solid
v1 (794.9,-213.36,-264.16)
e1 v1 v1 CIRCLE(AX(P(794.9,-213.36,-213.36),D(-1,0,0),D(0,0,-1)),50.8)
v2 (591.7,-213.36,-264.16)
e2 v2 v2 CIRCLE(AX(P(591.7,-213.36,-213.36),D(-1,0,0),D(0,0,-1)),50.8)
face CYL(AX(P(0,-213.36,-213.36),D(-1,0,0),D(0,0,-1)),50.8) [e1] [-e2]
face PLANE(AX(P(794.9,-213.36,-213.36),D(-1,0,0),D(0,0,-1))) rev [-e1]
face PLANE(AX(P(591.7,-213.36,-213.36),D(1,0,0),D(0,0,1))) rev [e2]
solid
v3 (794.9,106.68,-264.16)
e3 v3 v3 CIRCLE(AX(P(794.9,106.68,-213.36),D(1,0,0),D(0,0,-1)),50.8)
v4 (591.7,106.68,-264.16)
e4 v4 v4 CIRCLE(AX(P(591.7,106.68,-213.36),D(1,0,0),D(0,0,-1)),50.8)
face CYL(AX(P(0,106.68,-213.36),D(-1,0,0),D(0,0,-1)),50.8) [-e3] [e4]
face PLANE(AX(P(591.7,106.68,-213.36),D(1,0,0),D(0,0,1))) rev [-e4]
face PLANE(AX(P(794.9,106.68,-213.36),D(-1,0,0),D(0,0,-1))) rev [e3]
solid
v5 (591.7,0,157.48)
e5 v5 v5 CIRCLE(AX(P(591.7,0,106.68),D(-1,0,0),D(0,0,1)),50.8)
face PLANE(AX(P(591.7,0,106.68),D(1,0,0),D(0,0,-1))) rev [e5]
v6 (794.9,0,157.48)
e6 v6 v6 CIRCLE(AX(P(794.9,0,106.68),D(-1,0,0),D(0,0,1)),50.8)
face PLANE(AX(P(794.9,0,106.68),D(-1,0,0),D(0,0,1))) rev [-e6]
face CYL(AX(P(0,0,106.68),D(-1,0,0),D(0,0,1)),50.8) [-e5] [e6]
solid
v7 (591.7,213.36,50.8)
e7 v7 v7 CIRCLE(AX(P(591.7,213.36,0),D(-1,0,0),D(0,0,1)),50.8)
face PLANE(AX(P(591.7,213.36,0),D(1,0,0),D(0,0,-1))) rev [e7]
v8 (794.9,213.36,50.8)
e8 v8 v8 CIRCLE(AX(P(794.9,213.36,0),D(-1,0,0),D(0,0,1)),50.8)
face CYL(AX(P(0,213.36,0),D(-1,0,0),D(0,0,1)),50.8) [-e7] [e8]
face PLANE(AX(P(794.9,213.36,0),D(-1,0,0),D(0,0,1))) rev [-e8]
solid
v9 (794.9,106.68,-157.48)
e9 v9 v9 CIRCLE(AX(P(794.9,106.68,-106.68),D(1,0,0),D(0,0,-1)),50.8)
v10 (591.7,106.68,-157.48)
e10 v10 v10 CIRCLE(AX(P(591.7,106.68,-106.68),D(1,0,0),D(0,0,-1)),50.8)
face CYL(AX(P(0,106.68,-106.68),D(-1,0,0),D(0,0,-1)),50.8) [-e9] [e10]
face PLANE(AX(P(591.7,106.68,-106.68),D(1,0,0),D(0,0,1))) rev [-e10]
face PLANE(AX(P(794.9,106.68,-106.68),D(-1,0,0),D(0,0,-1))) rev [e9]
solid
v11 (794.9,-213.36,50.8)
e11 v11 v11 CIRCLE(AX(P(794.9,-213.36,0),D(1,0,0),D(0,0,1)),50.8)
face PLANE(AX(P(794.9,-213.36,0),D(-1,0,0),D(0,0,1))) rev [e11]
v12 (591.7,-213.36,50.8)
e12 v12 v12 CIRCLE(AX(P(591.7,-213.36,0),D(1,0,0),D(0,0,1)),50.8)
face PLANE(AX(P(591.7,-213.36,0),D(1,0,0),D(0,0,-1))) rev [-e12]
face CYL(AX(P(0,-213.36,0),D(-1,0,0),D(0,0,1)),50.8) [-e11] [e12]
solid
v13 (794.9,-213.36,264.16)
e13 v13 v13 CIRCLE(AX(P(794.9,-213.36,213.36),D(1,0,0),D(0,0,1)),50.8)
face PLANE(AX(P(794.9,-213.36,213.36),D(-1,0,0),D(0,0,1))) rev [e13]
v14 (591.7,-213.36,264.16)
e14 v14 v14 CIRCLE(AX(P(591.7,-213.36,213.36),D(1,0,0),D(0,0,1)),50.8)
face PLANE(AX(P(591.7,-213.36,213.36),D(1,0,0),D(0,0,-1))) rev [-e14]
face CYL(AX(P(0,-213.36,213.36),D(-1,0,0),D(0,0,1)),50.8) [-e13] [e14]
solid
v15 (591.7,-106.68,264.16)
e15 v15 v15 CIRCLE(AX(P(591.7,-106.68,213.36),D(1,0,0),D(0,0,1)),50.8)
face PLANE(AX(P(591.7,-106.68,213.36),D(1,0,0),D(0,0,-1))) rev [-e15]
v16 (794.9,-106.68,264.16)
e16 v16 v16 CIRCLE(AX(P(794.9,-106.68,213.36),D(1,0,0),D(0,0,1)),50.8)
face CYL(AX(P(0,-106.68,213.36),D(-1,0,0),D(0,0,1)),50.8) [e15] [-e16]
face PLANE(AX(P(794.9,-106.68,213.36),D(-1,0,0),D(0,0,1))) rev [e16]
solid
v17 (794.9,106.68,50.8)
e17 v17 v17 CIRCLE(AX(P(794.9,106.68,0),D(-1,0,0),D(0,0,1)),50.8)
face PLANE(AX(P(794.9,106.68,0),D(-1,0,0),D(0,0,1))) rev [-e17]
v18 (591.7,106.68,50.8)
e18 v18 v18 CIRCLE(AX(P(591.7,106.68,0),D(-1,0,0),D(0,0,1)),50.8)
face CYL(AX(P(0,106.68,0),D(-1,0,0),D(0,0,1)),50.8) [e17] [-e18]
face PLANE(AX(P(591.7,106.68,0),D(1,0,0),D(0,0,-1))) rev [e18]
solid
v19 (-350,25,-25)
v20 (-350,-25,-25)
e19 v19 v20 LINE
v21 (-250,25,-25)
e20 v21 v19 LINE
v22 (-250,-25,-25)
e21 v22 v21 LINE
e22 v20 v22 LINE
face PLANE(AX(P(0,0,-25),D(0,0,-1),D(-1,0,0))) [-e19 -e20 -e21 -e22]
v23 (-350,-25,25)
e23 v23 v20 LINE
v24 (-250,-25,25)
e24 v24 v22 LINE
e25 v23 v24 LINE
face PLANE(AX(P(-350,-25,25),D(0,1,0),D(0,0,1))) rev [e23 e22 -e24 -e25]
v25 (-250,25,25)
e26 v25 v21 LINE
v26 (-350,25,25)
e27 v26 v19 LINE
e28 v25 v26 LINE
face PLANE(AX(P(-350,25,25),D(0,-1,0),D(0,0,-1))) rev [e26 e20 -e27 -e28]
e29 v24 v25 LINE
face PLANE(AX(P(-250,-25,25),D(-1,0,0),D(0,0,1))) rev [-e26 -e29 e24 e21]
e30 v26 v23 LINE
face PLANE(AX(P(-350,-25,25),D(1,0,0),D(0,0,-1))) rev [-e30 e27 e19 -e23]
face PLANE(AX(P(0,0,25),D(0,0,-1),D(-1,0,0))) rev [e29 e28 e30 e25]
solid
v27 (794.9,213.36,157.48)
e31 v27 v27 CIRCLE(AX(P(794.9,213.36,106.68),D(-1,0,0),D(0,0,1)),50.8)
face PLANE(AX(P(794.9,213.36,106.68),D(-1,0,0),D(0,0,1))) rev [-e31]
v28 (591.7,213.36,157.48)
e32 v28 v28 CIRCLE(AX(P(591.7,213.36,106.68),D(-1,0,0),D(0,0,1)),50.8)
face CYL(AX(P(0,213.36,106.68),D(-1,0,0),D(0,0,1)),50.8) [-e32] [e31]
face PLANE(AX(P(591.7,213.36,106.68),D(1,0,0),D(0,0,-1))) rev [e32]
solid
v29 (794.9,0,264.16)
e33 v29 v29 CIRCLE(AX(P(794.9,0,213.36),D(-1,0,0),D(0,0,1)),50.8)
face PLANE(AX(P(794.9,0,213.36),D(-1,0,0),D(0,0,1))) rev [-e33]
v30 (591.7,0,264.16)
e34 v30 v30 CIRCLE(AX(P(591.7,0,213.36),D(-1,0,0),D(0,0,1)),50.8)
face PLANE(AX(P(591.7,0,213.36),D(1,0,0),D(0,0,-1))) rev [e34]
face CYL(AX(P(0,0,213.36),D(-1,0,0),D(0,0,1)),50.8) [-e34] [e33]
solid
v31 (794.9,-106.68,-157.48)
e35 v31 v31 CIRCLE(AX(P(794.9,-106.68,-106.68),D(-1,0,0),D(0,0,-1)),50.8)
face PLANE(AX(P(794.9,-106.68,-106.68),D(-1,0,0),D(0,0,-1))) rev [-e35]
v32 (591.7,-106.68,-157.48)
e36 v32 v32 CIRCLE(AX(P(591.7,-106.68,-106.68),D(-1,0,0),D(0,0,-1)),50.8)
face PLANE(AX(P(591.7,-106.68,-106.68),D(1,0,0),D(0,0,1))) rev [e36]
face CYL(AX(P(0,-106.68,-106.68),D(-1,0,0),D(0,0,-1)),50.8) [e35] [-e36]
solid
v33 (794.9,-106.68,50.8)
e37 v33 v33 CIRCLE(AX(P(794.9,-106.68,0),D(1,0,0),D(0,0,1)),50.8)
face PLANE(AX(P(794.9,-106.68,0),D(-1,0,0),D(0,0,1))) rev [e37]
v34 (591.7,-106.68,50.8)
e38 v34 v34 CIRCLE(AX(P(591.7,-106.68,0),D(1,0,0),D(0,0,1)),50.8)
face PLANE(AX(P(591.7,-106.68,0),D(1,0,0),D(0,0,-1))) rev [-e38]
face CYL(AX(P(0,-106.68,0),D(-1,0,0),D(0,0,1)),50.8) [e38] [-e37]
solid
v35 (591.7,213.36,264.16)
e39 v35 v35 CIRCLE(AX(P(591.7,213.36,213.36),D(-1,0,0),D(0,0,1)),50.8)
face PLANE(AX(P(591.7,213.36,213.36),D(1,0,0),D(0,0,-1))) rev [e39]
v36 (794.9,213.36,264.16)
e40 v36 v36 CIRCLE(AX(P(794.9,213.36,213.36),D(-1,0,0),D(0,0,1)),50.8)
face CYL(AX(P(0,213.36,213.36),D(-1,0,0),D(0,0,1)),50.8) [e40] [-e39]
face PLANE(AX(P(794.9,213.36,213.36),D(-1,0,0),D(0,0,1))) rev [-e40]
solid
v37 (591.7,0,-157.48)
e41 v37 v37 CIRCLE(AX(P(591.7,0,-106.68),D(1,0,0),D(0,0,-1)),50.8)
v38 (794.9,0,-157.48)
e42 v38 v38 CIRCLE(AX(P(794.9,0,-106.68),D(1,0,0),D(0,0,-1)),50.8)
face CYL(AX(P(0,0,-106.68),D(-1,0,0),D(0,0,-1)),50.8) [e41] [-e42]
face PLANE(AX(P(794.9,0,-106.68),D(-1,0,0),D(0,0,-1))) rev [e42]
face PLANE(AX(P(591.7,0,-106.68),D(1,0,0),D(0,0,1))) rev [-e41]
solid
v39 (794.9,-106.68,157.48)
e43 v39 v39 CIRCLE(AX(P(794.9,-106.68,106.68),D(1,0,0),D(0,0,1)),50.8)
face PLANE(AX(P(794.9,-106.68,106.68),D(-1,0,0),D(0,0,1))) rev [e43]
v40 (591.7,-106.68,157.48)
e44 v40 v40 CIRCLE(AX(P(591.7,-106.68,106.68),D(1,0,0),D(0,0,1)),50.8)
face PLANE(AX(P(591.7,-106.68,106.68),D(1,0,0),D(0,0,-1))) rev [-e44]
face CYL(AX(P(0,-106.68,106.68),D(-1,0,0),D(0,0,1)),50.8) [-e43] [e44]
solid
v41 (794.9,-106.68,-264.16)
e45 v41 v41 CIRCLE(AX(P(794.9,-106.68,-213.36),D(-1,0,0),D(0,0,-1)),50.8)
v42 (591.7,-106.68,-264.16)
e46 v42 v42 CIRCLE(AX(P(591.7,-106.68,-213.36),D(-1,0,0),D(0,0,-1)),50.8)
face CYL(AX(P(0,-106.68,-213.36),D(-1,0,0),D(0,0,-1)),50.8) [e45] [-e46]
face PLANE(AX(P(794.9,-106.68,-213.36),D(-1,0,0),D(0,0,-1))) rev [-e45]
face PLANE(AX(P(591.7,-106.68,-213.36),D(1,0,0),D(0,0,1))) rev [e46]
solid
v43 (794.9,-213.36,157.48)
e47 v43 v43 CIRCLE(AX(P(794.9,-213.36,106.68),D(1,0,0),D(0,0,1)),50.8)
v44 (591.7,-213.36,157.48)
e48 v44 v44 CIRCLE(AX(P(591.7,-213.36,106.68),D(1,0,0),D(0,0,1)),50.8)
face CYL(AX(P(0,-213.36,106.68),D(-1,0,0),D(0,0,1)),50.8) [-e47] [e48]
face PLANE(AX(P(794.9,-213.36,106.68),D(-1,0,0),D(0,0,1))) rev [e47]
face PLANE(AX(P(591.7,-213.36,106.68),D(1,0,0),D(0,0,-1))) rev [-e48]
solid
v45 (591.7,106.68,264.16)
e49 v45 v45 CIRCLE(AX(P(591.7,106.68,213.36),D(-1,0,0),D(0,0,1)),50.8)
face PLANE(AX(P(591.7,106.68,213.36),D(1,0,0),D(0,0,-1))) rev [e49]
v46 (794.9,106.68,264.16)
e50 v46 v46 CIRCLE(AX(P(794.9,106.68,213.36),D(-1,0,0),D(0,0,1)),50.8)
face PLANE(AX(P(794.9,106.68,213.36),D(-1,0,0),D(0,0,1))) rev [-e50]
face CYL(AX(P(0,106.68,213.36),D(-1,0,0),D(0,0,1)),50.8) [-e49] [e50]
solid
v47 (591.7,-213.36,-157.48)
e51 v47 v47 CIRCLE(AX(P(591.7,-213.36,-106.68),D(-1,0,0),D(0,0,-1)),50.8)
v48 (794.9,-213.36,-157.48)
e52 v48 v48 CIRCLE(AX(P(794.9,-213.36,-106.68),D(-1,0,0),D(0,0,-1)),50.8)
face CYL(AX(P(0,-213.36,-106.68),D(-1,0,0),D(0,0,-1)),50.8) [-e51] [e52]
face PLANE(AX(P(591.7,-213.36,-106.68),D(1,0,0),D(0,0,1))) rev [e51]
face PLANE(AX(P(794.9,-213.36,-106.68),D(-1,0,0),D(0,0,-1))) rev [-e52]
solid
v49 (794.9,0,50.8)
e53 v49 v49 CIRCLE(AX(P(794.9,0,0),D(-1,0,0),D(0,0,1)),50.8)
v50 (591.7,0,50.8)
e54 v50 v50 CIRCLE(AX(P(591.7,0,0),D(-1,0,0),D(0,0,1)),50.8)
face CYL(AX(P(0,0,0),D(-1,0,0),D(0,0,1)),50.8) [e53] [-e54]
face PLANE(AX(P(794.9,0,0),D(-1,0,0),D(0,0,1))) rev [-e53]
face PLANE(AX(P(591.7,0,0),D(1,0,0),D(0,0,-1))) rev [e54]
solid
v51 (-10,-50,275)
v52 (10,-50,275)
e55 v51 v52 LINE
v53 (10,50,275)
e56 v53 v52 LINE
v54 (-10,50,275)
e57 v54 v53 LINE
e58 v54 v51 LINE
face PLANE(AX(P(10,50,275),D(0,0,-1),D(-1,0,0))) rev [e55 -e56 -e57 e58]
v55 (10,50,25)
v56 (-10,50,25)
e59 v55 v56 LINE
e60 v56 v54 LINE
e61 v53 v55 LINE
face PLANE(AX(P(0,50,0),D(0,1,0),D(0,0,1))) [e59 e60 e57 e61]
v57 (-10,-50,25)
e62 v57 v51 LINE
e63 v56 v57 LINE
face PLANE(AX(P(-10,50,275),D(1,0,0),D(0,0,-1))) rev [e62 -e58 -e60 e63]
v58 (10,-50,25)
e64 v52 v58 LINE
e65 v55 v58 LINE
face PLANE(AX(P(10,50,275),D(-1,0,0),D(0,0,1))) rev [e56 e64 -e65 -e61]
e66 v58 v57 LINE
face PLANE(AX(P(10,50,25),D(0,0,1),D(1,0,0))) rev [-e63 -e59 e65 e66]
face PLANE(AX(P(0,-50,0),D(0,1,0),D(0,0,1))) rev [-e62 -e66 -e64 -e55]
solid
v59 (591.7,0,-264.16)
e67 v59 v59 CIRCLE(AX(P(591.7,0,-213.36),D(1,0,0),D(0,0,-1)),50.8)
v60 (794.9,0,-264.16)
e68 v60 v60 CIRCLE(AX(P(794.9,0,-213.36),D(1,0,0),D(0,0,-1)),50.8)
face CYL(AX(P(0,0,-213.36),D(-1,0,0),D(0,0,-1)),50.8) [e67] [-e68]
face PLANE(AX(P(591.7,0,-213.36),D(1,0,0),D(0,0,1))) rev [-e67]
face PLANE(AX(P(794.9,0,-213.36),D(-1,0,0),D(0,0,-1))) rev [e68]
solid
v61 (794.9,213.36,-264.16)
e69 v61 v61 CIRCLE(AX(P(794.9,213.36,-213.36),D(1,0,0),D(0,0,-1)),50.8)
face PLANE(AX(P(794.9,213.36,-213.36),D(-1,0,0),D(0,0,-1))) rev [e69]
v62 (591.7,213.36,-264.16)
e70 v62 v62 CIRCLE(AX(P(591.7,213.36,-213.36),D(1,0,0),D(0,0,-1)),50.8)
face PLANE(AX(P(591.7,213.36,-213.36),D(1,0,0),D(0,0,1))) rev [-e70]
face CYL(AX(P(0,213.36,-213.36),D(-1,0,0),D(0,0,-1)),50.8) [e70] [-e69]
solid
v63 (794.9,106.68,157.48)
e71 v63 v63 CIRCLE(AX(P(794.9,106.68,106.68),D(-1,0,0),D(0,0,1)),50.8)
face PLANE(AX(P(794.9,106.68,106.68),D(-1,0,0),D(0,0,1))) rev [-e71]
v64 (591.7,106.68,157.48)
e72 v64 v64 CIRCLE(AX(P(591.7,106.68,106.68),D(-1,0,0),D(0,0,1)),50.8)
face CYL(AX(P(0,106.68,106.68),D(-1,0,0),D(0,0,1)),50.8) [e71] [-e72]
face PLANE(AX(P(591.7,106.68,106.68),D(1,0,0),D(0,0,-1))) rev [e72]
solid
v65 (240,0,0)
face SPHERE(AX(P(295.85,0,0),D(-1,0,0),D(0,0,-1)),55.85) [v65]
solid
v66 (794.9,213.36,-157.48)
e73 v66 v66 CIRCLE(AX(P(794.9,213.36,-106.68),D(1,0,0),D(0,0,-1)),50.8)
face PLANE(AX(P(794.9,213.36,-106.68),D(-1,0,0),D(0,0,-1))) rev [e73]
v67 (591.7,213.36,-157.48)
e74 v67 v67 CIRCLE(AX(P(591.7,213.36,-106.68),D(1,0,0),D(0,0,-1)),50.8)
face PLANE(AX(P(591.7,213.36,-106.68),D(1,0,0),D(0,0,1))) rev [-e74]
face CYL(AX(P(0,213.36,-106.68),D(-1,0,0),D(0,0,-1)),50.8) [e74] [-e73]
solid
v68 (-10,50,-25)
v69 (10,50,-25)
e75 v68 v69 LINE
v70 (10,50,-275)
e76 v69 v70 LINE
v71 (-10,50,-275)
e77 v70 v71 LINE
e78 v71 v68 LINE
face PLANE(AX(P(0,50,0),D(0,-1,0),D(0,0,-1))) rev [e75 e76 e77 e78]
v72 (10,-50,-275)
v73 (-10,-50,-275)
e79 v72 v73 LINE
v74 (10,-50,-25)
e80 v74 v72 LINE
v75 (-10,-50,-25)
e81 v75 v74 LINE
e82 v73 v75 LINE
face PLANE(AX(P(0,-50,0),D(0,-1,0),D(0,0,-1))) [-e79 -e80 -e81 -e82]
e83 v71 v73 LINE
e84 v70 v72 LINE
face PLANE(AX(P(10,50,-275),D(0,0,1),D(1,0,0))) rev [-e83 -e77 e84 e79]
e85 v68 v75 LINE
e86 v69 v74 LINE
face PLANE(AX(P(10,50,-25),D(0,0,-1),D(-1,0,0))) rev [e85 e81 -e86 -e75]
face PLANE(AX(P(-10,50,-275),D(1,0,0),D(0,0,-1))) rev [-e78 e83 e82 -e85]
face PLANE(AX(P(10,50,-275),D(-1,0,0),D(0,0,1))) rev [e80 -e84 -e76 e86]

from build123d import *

# Parameters (mm, degrees)
SKETCH2_W             = 100
SKETCH2_H             = 50
BOSS_EXTRUDE2_DEPTH   = 25
SKETCH3_W             = 203.2
SKETCH3_H             = 50.8
SKETCH4_W             = 20
SKETCH4_H             = 250
BOSS_EXTRUDE3_DEPTH   = 50
BOSS_EXTRUDE3_2_DEPTH = 50
LPATTERN1_START       = 591.7
LPATTERN1_OUTLINE_R   = 50.8
LPATTERN1_DEPTH       = 203.2


# Read off the part's stored shape, not the designer's step: LPattern1
with BuildPart() as part:
    # Sketch2 → Boss-Extrude2 (new, symmetric)
    with BuildSketch(Plane.XY):
        with Locations((-300, 0)):
            Rectangle(SKETCH2_W, SKETCH2_H)
    extrude(amount=BOSS_EXTRUDE2_DEPTH, both=True)


with BuildPart() as body_2:
    # Sketch3 → Revolve1 (revolve)
    with BuildSketch(Plane(origin=(0, 0, 0), x_dir=(1, 0, 0), z_dir=(0, 1, 0))):
        with BuildLine():
            Line((240, 0), (351.7, 0))
            ThreePointArc((351.7, 0), (295.85, 55.85), (240, 0))
        make_face()
        with Locations((693.3, 25.4)):
            Rectangle(SKETCH3_W, SKETCH3_H)
    revolve(axis=Axis((0, 0, 0), (1, 0, 0)))


with BuildPart() as body_3:
    # Sketch4 → Boss-Extrude3 (new, symmetric)
    with BuildSketch(Plane(origin=(0, 0, 0), x_dir=(1, 0, 0), z_dir=(0, 1, 0))):
        with Locations((0, 150)):
            Rectangle(SKETCH4_W, SKETCH4_H)
    extrude(amount=BOSS_EXTRUDE3_DEPTH, both=True)


with BuildPart() as body_4:
    # Sketch4 → Boss-Extrude3 2 (new, symmetric)
    with BuildSketch(Plane(origin=(0, 0, 0), x_dir=(1, 0, 0), z_dir=(0, 1, 0))):
        with Locations((0, -150)):
            Rectangle(SKETCH4_W, SKETCH4_H)
    extrude(amount=BOSS_EXTRUDE3_2_DEPTH, both=True)


with BuildPart() as body_5:
    # LPattern1 outline → LPattern1 (new body)
    with BuildSketch(Plane.YZ.offset(LPATTERN1_START)):
        with Locations((213.36, 213.36)):
            Circle(LPATTERN1_OUTLINE_R)
        with Locations((213.36, 106.68)):
            Circle(LPATTERN1_OUTLINE_R)
        with Locations((213.36, 0)):
            Circle(LPATTERN1_OUTLINE_R)
        with Locations((106.68, 213.36)):
            Circle(LPATTERN1_OUTLINE_R)
        with Locations((106.68, 106.68)):
            Circle(LPATTERN1_OUTLINE_R)
        with Locations((106.68, 0)):
            Circle(LPATTERN1_OUTLINE_R)
        with Locations((0, 213.36)):
            Circle(LPATTERN1_OUTLINE_R)
        with Locations((0, 106.68)):
            Circle(LPATTERN1_OUTLINE_R)
    extrude(amount=LPATTERN1_DEPTH)

    # Mirror1: body 5 across plane


with BuildPart() as body_5_1:
    add(body_5.part)
    add(body_5.part.mirror(Plane.XY))

    # Mirror2: body 5 across plane


with BuildPart() as body_5_2:
    add(body_5_1.part)
    add(body_5_1.part.mirror(Plane.ZX))


solid = Compound([part.part, body_2.part, body_3.part, body_4.part, body_5_2.part])
